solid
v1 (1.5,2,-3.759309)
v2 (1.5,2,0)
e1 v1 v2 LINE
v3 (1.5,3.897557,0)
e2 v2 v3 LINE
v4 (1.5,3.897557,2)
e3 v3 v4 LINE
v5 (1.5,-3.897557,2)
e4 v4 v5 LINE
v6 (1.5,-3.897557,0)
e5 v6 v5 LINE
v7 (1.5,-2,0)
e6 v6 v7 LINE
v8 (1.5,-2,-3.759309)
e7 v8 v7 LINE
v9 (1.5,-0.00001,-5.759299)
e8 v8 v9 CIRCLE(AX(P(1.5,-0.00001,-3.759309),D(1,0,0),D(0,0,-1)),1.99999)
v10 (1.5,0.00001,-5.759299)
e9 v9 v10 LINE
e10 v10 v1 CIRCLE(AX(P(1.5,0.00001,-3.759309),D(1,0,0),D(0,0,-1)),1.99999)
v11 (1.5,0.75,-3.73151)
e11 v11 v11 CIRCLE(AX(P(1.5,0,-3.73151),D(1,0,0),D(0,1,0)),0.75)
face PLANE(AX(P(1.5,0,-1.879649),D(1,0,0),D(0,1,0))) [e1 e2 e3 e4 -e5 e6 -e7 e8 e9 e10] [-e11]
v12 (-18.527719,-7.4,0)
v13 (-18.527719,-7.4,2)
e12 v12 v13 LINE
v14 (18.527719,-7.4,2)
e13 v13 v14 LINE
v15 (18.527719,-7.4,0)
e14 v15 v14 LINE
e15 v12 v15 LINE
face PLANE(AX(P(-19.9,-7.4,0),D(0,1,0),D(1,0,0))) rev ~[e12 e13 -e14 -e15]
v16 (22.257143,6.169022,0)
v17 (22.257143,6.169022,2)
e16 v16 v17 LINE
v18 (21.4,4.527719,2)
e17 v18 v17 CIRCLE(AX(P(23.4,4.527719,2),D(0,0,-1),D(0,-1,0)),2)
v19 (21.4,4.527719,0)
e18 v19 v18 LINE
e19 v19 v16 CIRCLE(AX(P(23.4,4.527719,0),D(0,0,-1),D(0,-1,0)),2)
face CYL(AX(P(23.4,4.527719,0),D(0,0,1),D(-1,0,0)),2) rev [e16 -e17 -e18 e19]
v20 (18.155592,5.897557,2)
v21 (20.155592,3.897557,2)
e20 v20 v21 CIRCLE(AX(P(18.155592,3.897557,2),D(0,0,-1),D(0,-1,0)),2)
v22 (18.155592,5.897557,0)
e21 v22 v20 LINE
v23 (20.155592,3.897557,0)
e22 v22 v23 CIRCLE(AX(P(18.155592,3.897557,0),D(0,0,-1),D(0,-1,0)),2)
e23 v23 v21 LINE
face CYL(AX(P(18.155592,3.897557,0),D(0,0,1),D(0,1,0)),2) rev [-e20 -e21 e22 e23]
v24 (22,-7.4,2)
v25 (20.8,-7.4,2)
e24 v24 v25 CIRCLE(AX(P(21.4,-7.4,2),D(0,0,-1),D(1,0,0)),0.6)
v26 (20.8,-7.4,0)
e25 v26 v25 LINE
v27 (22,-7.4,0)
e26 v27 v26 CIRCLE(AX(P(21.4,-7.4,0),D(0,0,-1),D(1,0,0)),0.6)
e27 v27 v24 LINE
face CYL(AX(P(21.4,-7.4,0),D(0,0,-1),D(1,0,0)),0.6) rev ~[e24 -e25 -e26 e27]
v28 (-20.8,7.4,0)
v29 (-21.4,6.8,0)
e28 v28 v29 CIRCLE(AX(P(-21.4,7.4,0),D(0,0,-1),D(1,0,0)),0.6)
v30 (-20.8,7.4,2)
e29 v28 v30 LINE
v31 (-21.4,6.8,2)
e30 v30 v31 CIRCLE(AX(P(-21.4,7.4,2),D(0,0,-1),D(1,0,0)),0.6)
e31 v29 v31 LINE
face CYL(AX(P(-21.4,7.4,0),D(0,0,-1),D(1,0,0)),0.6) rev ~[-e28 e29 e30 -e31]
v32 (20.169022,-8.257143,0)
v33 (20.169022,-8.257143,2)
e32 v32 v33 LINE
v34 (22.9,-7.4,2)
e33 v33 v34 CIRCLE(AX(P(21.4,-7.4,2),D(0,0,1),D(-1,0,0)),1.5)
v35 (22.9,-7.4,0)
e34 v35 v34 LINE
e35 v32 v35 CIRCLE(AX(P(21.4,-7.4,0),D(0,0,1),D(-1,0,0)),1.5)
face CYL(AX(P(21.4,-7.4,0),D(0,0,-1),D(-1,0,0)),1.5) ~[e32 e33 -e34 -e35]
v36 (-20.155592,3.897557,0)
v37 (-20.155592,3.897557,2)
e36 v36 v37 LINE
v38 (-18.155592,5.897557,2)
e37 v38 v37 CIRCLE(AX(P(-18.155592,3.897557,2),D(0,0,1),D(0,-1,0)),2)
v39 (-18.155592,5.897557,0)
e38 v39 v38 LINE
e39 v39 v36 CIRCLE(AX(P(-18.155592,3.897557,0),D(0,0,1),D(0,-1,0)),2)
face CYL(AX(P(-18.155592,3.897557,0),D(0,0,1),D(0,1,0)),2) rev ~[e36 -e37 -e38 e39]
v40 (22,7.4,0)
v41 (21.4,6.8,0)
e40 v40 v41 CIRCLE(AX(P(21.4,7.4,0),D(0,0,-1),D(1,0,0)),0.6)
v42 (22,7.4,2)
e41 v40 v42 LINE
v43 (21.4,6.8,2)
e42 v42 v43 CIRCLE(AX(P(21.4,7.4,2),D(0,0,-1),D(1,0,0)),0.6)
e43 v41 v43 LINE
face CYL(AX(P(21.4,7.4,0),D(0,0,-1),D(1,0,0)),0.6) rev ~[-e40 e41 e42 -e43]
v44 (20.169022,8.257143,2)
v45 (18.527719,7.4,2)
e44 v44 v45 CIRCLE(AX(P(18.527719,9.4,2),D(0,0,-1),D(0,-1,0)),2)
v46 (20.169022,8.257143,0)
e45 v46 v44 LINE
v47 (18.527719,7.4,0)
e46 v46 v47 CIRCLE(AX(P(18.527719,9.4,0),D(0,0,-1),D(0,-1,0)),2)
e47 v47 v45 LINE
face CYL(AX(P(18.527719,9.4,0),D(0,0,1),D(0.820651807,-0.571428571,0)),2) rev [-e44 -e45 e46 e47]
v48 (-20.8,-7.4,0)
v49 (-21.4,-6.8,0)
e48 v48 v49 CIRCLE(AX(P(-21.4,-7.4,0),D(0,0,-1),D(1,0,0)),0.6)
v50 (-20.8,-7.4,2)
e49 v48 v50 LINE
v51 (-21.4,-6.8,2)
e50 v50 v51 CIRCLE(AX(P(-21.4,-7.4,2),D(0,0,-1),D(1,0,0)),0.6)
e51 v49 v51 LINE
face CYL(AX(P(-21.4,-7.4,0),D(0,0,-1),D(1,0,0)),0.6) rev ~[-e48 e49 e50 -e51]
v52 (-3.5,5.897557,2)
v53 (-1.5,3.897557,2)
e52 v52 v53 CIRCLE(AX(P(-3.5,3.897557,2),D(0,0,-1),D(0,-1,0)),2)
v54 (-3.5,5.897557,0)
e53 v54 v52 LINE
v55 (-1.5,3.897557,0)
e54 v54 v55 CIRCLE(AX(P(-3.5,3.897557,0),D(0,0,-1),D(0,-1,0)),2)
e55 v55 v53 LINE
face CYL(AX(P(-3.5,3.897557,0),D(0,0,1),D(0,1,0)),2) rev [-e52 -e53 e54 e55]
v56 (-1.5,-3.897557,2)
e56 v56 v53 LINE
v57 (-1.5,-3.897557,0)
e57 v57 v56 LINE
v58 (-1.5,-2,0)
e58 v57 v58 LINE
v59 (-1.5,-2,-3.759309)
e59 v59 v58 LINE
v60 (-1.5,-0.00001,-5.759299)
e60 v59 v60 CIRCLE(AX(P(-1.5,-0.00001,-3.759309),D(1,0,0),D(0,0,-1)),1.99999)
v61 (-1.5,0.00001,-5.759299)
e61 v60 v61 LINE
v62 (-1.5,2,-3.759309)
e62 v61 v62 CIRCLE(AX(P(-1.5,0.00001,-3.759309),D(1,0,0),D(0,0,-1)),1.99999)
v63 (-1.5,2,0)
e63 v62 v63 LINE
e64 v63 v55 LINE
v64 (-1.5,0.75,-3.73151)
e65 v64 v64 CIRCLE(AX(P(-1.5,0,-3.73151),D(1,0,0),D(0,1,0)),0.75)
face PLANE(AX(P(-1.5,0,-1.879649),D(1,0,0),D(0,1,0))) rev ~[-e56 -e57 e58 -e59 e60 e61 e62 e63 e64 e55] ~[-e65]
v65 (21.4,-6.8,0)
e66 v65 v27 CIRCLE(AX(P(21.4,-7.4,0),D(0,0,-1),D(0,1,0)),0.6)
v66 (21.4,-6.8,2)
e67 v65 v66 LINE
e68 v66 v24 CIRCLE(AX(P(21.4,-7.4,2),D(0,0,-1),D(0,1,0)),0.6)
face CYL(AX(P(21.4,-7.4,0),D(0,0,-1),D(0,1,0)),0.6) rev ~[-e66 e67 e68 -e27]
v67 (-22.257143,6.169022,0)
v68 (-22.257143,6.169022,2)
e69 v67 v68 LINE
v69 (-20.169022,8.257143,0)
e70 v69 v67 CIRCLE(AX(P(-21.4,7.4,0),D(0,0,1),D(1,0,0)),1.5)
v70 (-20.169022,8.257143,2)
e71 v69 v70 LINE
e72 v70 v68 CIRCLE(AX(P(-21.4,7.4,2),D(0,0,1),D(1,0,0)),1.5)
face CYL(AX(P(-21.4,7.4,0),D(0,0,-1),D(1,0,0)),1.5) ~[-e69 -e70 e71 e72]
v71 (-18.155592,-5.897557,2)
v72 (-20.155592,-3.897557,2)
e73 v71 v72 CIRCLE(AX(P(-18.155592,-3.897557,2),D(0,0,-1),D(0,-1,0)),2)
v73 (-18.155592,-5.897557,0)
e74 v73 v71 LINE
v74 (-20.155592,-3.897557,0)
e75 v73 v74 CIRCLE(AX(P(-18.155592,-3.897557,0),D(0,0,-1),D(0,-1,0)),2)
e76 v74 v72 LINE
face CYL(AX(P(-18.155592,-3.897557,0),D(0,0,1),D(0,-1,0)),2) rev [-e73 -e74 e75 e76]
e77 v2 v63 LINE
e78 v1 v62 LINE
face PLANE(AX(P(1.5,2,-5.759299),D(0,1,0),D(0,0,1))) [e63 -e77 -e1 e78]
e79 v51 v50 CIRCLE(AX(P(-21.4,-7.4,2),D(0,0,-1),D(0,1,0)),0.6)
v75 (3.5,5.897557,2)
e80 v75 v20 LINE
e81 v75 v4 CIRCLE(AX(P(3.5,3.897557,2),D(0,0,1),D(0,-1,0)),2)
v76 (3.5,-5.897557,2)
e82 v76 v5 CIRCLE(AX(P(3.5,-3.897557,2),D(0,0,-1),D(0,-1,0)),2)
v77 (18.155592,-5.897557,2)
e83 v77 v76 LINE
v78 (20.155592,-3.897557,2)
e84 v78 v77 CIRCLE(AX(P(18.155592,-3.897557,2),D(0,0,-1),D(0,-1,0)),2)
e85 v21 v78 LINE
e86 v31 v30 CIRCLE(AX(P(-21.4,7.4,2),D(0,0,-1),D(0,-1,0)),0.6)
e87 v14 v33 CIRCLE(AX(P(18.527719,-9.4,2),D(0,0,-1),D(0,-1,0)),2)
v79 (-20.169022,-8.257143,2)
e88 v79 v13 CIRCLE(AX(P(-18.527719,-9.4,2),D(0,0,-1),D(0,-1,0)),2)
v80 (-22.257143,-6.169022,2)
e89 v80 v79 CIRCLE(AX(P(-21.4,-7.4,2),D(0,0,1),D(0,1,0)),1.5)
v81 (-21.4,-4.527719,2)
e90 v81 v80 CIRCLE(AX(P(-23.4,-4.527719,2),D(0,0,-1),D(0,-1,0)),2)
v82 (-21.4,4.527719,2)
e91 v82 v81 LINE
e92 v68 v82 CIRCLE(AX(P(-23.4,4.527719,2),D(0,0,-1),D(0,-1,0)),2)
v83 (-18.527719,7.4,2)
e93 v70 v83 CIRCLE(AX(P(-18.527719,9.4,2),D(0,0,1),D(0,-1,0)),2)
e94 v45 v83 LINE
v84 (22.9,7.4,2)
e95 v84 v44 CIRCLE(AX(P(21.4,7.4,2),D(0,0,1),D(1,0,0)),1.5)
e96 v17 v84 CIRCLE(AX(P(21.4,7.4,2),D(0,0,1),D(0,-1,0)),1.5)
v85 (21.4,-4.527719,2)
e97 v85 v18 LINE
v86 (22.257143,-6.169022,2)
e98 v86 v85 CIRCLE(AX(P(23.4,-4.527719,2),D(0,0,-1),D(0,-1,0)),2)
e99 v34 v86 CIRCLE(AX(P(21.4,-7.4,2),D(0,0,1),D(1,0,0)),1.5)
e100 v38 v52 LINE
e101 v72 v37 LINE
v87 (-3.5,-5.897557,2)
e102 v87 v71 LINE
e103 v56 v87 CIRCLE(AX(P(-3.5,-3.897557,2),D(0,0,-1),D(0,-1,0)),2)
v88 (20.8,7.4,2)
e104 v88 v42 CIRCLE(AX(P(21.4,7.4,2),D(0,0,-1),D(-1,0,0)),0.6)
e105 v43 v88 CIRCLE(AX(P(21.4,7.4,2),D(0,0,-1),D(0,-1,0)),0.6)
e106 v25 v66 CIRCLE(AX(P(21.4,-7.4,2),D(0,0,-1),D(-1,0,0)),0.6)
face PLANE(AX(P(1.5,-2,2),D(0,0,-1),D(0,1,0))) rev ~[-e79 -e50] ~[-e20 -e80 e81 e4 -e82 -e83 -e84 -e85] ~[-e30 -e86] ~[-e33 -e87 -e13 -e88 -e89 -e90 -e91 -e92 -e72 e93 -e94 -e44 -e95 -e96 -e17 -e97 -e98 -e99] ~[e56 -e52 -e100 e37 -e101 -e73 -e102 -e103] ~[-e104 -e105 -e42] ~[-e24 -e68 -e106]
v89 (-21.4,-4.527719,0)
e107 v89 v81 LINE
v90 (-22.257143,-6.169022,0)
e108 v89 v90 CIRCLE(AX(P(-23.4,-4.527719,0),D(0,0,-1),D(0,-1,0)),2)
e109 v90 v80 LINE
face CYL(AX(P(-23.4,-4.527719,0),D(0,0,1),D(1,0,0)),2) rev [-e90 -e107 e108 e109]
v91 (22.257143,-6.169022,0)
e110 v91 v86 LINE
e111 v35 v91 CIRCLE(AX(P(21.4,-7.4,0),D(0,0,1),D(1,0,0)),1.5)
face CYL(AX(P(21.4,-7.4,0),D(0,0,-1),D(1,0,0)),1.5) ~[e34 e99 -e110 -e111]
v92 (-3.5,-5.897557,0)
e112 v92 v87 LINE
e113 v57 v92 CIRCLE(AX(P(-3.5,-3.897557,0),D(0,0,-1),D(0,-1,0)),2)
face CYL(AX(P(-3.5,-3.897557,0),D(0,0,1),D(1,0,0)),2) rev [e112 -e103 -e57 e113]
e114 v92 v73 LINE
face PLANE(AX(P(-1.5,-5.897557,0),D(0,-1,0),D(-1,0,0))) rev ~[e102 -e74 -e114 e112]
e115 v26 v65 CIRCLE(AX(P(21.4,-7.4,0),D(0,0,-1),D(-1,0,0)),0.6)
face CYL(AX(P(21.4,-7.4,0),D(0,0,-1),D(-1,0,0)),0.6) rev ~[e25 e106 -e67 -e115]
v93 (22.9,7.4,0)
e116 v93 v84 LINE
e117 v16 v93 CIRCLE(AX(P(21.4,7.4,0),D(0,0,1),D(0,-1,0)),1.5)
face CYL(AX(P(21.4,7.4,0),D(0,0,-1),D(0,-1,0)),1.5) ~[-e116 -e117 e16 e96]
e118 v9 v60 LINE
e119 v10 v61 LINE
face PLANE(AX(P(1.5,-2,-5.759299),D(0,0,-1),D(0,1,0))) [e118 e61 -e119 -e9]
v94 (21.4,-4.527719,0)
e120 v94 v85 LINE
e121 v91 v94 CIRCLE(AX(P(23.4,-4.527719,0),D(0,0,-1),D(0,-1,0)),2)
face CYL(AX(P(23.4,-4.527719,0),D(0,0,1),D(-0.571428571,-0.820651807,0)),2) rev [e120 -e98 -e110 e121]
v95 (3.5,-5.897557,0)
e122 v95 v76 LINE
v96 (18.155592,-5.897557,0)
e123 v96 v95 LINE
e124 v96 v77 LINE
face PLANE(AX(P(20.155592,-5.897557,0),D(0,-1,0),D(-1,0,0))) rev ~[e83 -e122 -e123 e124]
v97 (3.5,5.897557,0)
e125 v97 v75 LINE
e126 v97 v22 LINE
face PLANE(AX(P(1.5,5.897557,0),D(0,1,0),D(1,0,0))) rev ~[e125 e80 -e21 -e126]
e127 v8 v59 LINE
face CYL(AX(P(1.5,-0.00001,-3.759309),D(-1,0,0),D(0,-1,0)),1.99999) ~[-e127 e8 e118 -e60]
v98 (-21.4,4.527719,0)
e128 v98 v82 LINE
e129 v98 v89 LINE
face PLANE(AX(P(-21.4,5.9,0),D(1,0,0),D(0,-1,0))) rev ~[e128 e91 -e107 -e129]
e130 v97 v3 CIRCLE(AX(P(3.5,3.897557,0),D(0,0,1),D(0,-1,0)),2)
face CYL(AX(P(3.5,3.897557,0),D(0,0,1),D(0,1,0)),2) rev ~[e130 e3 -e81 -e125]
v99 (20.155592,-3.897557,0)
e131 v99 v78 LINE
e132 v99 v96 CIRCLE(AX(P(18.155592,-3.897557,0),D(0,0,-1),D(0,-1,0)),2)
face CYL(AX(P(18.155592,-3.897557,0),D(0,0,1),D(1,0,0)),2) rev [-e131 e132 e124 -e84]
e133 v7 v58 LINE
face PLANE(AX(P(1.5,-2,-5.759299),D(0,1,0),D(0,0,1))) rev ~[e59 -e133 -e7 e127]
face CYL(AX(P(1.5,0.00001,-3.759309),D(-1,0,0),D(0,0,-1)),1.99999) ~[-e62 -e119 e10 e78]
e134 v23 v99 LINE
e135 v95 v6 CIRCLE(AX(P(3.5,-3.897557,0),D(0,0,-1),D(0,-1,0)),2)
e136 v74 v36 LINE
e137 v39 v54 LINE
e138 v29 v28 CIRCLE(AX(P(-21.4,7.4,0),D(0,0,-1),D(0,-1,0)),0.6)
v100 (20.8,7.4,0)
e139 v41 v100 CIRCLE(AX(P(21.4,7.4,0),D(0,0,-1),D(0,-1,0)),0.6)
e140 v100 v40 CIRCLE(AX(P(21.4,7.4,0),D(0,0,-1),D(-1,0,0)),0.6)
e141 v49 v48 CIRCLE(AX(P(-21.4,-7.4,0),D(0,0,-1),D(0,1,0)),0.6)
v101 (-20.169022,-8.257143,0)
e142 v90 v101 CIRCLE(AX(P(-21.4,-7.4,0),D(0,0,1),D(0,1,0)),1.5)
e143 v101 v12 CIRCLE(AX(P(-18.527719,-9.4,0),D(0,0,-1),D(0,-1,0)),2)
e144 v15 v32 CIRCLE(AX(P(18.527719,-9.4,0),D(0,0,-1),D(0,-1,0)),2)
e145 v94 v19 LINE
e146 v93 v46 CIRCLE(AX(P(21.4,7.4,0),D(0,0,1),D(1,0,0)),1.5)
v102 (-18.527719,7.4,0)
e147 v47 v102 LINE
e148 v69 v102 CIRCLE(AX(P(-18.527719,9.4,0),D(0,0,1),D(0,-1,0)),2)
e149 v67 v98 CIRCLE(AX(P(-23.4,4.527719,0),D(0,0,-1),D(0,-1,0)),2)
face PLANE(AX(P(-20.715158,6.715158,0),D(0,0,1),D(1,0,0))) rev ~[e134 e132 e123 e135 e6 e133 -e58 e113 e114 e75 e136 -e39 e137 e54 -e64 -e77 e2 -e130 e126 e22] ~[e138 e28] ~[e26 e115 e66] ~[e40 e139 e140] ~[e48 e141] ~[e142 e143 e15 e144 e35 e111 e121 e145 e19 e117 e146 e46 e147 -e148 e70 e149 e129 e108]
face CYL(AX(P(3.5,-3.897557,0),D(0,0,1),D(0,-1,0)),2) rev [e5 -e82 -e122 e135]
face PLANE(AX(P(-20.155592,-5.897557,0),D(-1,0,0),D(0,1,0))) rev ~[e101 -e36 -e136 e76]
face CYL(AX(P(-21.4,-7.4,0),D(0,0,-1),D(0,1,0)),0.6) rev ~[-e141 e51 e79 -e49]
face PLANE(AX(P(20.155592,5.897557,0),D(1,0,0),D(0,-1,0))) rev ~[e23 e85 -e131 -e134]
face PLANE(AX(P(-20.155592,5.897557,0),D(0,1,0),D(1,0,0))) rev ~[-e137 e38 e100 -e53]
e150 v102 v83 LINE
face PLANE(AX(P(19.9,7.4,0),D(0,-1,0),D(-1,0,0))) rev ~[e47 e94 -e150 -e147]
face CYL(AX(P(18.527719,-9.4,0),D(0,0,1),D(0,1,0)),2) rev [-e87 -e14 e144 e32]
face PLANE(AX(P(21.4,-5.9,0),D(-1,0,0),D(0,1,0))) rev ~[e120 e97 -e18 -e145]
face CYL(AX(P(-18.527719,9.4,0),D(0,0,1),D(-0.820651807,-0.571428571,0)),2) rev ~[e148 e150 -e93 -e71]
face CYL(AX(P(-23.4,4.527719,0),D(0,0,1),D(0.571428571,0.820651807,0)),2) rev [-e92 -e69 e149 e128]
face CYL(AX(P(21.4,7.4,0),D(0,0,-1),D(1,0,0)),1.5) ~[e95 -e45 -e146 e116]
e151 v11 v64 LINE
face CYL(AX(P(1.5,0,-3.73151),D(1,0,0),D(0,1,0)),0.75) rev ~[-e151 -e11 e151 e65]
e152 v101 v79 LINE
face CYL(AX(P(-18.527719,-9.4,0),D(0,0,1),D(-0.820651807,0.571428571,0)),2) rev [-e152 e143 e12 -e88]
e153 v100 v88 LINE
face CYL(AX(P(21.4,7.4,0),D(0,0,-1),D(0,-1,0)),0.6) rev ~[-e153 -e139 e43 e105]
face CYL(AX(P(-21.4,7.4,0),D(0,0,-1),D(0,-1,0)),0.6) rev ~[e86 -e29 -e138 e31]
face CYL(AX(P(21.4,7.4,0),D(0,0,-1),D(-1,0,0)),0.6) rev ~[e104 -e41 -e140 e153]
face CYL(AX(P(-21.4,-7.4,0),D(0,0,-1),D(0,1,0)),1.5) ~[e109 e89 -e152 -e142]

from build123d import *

# Parameters (mm, degrees)
F0_W     = 3
F0_H     = 0.7113954189
F0_H_2   = 11.7951147258
F1_DEPTH = 2
F2_R     = 2
F3_W     = 4
F3_H     = 7.7592988014
F3_R     = 0.75
F4_DEPTH = 3
F5_R     = 1.99999


# Not quite as in the source:
# - a fillet or chamfer is up to 0.001 mm smaller than in the source, because OpenCascade refuses the exact size


with BuildPart() as f1:
    # F0 (on Top) → F1 (new body)
    with BuildSketch(Plane.XY):
        with BuildLine():
            ThreePointArc((-21.4, 5.9), (-20.3393398282, 6.3393398282), (-19.9, 7.4))
            Line((-19.9, 7.4), (-20.8, 7.4))
            ThreePointArc((-20.8, 7.4), (-20.9757359313, 6.9757359313), (-21.4, 6.8))
            Line((-21.4, 6.8), (-21.4, 5.9))
        make_face()
        with BuildLine():
            Line((-20.8, 7.4), (-19.9, 7.4))
            ThreePointArc((-19.9, 7.4), (-22.4606601718, 8.4606601718), (-21.4, 5.9))
            Line((-21.4, 5.9), (-21.4, 6.8))
            ThreePointArc((-21.4, 6.8), (-21.8242640687, 7.8242640687), (-20.8, 7.4))
        make_face()
        with BuildLine():
            Line((19.9, 7.4), (-19.9, 7.4))
            ThreePointArc((-19.9, 7.4), (-20.3393398282, 6.3393398282), (-21.4, 5.9))
            Line((-21.4, 5.9), (-21.4, -5.9))
            ThreePointArc((-21.4, -5.9), (-20.3393398282, -6.3393398282), (-19.9, -7.4))
            Line((-19.9, -7.4), (19.9, -7.4))
            ThreePointArc((19.9, -7.4), (20.0395252165, -6.7682497618), (20.4321444846, -6.2540263086))
            Line((20.4321444846, -6.2540263086), (20.4321444846, 6.2540263086))
            ThreePointArc((20.4321444846, 6.2540263086), (20.0395252165, 6.7682497618), (19.9, 7.4))
        make_face()
        Polygon((-1.5, 5.8975573629), (-1.5, 6.6089527819), (1.5, 6.6089527819), (1.5, 5.8975573629), (20.1555918902, 5.8975573629), (20.1555918902, -5.8975573629), (1.5, -5.8975573629), (1.5, -6.6089527819), (-1.5, -6.6089527819), (-1.5, -5.8975573629), (-20.1555918902, -5.8975573629), (-20.1555918902, 5.8975573629), align=None, mode=Mode.SUBTRACT)
        with BuildLine():
            ThreePointArc((22.9, 7.4), (21.4, 8.9), (19.9, 7.4))
            Line((19.9, 7.4), (20.8, 7.4))
            ThreePointArc((20.8, 7.4), (21.4, 8), (22, 7.4))
            ThreePointArc((22, 7.4), (21.8242640687, 6.9757359313), (21.4, 6.8))
            Line((21.4, 6.8), (21.4, 5.9))
            ThreePointArc((21.4, 5.9), (22.4606601718, 6.3393398282), (22.9, 7.4))
        make_face()
        with BuildLine():
            Line((20.8, 7.4), (19.9, 7.4))
            ThreePointArc((19.9, 7.4), (20.0395252165, 6.7682497618), (20.4321444846, 6.2540263086))
            ThreePointArc((20.4321444846, 6.2540263086), (20.8847139324, 5.9912841775), (21.4, 5.9))
            Line((21.4, 5.9), (21.4, 6.8))
            ThreePointArc((21.4, 6.8), (20.9757359313, 6.9757359313), (20.8, 7.4))
        make_face()
        with BuildLine():
            ThreePointArc((21.4, 5.9), (20.8847139324, 5.9912841775), (20.4321444846, 6.2540263086))
            Line((20.4321444846, 6.2540263086), (20.4321444846, -6.2540263086))
            ThreePointArc((20.4321444846, -6.2540263086), (20.8847139324, -5.9912841775), (21.4, -5.9))
            Line((21.4, -5.9), (21.4, 5.9))
        make_face()
        with BuildLine():
            ThreePointArc((-19.9, -7.4), (-20.3393398282, -6.3393398282), (-21.4, -5.9))
            Line((-21.4, -5.9), (-21.4, -6.8))
            ThreePointArc((-21.4, -6.8), (-20.9757359313, -6.9757359313), (-20.8, -7.4))
            Line((-20.8, -7.4), (-19.9, -7.4))
        make_face()
        with BuildLine():
            Line((-21.4, -6.8), (-21.4, -5.9))
            ThreePointArc((-21.4, -5.9), (-22.4606601718, -8.4606601718), (-19.9, -7.4))
            Line((-19.9, -7.4), (-20.8, -7.4))
            ThreePointArc((-20.8, -7.4), (-21.8242640687, -7.8242640687), (-21.4, -6.8))
        make_face()
        with BuildLine():
            ThreePointArc((21.4, -5.9), (20.8847139324, -5.9912841775), (20.4321444846, -6.2540263086))
            ThreePointArc((20.4321444846, -6.2540263086), (20.0395252165, -6.7682497618), (19.9, -7.4))
            Line((19.9, -7.4), (20.8, -7.4))
            ThreePointArc((20.8, -7.4), (20.9757359313, -6.9757359313), (21.4, -6.8))
            Line((21.4, -6.8), (21.4, -5.9))
        make_face()
        with BuildLine():
            ThreePointArc((22.9, -7.4), (22.4606601718, -6.3393398282), (21.4, -5.9))
            Line((21.4, -5.9), (21.4, -6.8))
            ThreePointArc((21.4, -6.8), (21.8242640687, -6.9757359313), (22, -7.4))
            ThreePointArc((22, -7.4), (21.4, -8), (20.8, -7.4))
            Line((20.8, -7.4), (19.9, -7.4))
            ThreePointArc((19.9, -7.4), (21.4, -8.9), (22.9, -7.4))
        make_face()
        with Locations((0, 6.2532550724)):
            Rectangle(F0_W, F0_H)
        with Locations((0, -6.2532550724)):
            Rectangle(F0_W, F0_H)
        Rectangle(F0_W, F0_H_2)
    extrude(amount=F1_DEPTH)

    # F2
    f2_edges = [f1.edges().sort_by_distance(p)[0] for p in [
        (-19.9, 7.4, 1),
        (-19.9, -7.4, 1),
        (-1.5, -5.897557, 1),
        (-20.155592, -5.897557, 1),
        (-20.155592, 5.897557, 1),
        (20.155592, 5.897557, 1),
        (20.155592, -5.897557, 1),
        (1.5, 5.897557, 1),
        (-1.5, 5.897557, 1),
        (1.5, -5.897557, 1),
        (-21.4, 5.9, 1),
        (-21.4, -5.9, 1),
        (19.9, -7.4, 1),
        (21.4, -5.9, 1),
        (21.4, 5.9, 1),
        (19.9, 7.4, 1),
    ]]
    fillet(f2_edges, radius=F2_R)

    # F3 (on face) → F4 (join, through all)
    with BuildSketch(Plane.YZ.offset(1.5)):
        with Locations((0, -1.8796494007)):
            Rectangle(F3_W, F3_H)
        with Locations((0, -3.7315103691)):
            Circle(F3_R, mode=Mode.SUBTRACT)
    extrude(amount=-F4_DEPTH)

    # F5 (radius 2 in the source; OpenCascade refuses exactly that, so slightly less here)
    f5_edges = [f1.edges().sort_by_distance(p)[0] for p in [
        (0, 2, -5.759299),
        (0, -2, -5.759299),
    ]]
    fillet(f5_edges, radius=F5_R)


solid = f1.part
